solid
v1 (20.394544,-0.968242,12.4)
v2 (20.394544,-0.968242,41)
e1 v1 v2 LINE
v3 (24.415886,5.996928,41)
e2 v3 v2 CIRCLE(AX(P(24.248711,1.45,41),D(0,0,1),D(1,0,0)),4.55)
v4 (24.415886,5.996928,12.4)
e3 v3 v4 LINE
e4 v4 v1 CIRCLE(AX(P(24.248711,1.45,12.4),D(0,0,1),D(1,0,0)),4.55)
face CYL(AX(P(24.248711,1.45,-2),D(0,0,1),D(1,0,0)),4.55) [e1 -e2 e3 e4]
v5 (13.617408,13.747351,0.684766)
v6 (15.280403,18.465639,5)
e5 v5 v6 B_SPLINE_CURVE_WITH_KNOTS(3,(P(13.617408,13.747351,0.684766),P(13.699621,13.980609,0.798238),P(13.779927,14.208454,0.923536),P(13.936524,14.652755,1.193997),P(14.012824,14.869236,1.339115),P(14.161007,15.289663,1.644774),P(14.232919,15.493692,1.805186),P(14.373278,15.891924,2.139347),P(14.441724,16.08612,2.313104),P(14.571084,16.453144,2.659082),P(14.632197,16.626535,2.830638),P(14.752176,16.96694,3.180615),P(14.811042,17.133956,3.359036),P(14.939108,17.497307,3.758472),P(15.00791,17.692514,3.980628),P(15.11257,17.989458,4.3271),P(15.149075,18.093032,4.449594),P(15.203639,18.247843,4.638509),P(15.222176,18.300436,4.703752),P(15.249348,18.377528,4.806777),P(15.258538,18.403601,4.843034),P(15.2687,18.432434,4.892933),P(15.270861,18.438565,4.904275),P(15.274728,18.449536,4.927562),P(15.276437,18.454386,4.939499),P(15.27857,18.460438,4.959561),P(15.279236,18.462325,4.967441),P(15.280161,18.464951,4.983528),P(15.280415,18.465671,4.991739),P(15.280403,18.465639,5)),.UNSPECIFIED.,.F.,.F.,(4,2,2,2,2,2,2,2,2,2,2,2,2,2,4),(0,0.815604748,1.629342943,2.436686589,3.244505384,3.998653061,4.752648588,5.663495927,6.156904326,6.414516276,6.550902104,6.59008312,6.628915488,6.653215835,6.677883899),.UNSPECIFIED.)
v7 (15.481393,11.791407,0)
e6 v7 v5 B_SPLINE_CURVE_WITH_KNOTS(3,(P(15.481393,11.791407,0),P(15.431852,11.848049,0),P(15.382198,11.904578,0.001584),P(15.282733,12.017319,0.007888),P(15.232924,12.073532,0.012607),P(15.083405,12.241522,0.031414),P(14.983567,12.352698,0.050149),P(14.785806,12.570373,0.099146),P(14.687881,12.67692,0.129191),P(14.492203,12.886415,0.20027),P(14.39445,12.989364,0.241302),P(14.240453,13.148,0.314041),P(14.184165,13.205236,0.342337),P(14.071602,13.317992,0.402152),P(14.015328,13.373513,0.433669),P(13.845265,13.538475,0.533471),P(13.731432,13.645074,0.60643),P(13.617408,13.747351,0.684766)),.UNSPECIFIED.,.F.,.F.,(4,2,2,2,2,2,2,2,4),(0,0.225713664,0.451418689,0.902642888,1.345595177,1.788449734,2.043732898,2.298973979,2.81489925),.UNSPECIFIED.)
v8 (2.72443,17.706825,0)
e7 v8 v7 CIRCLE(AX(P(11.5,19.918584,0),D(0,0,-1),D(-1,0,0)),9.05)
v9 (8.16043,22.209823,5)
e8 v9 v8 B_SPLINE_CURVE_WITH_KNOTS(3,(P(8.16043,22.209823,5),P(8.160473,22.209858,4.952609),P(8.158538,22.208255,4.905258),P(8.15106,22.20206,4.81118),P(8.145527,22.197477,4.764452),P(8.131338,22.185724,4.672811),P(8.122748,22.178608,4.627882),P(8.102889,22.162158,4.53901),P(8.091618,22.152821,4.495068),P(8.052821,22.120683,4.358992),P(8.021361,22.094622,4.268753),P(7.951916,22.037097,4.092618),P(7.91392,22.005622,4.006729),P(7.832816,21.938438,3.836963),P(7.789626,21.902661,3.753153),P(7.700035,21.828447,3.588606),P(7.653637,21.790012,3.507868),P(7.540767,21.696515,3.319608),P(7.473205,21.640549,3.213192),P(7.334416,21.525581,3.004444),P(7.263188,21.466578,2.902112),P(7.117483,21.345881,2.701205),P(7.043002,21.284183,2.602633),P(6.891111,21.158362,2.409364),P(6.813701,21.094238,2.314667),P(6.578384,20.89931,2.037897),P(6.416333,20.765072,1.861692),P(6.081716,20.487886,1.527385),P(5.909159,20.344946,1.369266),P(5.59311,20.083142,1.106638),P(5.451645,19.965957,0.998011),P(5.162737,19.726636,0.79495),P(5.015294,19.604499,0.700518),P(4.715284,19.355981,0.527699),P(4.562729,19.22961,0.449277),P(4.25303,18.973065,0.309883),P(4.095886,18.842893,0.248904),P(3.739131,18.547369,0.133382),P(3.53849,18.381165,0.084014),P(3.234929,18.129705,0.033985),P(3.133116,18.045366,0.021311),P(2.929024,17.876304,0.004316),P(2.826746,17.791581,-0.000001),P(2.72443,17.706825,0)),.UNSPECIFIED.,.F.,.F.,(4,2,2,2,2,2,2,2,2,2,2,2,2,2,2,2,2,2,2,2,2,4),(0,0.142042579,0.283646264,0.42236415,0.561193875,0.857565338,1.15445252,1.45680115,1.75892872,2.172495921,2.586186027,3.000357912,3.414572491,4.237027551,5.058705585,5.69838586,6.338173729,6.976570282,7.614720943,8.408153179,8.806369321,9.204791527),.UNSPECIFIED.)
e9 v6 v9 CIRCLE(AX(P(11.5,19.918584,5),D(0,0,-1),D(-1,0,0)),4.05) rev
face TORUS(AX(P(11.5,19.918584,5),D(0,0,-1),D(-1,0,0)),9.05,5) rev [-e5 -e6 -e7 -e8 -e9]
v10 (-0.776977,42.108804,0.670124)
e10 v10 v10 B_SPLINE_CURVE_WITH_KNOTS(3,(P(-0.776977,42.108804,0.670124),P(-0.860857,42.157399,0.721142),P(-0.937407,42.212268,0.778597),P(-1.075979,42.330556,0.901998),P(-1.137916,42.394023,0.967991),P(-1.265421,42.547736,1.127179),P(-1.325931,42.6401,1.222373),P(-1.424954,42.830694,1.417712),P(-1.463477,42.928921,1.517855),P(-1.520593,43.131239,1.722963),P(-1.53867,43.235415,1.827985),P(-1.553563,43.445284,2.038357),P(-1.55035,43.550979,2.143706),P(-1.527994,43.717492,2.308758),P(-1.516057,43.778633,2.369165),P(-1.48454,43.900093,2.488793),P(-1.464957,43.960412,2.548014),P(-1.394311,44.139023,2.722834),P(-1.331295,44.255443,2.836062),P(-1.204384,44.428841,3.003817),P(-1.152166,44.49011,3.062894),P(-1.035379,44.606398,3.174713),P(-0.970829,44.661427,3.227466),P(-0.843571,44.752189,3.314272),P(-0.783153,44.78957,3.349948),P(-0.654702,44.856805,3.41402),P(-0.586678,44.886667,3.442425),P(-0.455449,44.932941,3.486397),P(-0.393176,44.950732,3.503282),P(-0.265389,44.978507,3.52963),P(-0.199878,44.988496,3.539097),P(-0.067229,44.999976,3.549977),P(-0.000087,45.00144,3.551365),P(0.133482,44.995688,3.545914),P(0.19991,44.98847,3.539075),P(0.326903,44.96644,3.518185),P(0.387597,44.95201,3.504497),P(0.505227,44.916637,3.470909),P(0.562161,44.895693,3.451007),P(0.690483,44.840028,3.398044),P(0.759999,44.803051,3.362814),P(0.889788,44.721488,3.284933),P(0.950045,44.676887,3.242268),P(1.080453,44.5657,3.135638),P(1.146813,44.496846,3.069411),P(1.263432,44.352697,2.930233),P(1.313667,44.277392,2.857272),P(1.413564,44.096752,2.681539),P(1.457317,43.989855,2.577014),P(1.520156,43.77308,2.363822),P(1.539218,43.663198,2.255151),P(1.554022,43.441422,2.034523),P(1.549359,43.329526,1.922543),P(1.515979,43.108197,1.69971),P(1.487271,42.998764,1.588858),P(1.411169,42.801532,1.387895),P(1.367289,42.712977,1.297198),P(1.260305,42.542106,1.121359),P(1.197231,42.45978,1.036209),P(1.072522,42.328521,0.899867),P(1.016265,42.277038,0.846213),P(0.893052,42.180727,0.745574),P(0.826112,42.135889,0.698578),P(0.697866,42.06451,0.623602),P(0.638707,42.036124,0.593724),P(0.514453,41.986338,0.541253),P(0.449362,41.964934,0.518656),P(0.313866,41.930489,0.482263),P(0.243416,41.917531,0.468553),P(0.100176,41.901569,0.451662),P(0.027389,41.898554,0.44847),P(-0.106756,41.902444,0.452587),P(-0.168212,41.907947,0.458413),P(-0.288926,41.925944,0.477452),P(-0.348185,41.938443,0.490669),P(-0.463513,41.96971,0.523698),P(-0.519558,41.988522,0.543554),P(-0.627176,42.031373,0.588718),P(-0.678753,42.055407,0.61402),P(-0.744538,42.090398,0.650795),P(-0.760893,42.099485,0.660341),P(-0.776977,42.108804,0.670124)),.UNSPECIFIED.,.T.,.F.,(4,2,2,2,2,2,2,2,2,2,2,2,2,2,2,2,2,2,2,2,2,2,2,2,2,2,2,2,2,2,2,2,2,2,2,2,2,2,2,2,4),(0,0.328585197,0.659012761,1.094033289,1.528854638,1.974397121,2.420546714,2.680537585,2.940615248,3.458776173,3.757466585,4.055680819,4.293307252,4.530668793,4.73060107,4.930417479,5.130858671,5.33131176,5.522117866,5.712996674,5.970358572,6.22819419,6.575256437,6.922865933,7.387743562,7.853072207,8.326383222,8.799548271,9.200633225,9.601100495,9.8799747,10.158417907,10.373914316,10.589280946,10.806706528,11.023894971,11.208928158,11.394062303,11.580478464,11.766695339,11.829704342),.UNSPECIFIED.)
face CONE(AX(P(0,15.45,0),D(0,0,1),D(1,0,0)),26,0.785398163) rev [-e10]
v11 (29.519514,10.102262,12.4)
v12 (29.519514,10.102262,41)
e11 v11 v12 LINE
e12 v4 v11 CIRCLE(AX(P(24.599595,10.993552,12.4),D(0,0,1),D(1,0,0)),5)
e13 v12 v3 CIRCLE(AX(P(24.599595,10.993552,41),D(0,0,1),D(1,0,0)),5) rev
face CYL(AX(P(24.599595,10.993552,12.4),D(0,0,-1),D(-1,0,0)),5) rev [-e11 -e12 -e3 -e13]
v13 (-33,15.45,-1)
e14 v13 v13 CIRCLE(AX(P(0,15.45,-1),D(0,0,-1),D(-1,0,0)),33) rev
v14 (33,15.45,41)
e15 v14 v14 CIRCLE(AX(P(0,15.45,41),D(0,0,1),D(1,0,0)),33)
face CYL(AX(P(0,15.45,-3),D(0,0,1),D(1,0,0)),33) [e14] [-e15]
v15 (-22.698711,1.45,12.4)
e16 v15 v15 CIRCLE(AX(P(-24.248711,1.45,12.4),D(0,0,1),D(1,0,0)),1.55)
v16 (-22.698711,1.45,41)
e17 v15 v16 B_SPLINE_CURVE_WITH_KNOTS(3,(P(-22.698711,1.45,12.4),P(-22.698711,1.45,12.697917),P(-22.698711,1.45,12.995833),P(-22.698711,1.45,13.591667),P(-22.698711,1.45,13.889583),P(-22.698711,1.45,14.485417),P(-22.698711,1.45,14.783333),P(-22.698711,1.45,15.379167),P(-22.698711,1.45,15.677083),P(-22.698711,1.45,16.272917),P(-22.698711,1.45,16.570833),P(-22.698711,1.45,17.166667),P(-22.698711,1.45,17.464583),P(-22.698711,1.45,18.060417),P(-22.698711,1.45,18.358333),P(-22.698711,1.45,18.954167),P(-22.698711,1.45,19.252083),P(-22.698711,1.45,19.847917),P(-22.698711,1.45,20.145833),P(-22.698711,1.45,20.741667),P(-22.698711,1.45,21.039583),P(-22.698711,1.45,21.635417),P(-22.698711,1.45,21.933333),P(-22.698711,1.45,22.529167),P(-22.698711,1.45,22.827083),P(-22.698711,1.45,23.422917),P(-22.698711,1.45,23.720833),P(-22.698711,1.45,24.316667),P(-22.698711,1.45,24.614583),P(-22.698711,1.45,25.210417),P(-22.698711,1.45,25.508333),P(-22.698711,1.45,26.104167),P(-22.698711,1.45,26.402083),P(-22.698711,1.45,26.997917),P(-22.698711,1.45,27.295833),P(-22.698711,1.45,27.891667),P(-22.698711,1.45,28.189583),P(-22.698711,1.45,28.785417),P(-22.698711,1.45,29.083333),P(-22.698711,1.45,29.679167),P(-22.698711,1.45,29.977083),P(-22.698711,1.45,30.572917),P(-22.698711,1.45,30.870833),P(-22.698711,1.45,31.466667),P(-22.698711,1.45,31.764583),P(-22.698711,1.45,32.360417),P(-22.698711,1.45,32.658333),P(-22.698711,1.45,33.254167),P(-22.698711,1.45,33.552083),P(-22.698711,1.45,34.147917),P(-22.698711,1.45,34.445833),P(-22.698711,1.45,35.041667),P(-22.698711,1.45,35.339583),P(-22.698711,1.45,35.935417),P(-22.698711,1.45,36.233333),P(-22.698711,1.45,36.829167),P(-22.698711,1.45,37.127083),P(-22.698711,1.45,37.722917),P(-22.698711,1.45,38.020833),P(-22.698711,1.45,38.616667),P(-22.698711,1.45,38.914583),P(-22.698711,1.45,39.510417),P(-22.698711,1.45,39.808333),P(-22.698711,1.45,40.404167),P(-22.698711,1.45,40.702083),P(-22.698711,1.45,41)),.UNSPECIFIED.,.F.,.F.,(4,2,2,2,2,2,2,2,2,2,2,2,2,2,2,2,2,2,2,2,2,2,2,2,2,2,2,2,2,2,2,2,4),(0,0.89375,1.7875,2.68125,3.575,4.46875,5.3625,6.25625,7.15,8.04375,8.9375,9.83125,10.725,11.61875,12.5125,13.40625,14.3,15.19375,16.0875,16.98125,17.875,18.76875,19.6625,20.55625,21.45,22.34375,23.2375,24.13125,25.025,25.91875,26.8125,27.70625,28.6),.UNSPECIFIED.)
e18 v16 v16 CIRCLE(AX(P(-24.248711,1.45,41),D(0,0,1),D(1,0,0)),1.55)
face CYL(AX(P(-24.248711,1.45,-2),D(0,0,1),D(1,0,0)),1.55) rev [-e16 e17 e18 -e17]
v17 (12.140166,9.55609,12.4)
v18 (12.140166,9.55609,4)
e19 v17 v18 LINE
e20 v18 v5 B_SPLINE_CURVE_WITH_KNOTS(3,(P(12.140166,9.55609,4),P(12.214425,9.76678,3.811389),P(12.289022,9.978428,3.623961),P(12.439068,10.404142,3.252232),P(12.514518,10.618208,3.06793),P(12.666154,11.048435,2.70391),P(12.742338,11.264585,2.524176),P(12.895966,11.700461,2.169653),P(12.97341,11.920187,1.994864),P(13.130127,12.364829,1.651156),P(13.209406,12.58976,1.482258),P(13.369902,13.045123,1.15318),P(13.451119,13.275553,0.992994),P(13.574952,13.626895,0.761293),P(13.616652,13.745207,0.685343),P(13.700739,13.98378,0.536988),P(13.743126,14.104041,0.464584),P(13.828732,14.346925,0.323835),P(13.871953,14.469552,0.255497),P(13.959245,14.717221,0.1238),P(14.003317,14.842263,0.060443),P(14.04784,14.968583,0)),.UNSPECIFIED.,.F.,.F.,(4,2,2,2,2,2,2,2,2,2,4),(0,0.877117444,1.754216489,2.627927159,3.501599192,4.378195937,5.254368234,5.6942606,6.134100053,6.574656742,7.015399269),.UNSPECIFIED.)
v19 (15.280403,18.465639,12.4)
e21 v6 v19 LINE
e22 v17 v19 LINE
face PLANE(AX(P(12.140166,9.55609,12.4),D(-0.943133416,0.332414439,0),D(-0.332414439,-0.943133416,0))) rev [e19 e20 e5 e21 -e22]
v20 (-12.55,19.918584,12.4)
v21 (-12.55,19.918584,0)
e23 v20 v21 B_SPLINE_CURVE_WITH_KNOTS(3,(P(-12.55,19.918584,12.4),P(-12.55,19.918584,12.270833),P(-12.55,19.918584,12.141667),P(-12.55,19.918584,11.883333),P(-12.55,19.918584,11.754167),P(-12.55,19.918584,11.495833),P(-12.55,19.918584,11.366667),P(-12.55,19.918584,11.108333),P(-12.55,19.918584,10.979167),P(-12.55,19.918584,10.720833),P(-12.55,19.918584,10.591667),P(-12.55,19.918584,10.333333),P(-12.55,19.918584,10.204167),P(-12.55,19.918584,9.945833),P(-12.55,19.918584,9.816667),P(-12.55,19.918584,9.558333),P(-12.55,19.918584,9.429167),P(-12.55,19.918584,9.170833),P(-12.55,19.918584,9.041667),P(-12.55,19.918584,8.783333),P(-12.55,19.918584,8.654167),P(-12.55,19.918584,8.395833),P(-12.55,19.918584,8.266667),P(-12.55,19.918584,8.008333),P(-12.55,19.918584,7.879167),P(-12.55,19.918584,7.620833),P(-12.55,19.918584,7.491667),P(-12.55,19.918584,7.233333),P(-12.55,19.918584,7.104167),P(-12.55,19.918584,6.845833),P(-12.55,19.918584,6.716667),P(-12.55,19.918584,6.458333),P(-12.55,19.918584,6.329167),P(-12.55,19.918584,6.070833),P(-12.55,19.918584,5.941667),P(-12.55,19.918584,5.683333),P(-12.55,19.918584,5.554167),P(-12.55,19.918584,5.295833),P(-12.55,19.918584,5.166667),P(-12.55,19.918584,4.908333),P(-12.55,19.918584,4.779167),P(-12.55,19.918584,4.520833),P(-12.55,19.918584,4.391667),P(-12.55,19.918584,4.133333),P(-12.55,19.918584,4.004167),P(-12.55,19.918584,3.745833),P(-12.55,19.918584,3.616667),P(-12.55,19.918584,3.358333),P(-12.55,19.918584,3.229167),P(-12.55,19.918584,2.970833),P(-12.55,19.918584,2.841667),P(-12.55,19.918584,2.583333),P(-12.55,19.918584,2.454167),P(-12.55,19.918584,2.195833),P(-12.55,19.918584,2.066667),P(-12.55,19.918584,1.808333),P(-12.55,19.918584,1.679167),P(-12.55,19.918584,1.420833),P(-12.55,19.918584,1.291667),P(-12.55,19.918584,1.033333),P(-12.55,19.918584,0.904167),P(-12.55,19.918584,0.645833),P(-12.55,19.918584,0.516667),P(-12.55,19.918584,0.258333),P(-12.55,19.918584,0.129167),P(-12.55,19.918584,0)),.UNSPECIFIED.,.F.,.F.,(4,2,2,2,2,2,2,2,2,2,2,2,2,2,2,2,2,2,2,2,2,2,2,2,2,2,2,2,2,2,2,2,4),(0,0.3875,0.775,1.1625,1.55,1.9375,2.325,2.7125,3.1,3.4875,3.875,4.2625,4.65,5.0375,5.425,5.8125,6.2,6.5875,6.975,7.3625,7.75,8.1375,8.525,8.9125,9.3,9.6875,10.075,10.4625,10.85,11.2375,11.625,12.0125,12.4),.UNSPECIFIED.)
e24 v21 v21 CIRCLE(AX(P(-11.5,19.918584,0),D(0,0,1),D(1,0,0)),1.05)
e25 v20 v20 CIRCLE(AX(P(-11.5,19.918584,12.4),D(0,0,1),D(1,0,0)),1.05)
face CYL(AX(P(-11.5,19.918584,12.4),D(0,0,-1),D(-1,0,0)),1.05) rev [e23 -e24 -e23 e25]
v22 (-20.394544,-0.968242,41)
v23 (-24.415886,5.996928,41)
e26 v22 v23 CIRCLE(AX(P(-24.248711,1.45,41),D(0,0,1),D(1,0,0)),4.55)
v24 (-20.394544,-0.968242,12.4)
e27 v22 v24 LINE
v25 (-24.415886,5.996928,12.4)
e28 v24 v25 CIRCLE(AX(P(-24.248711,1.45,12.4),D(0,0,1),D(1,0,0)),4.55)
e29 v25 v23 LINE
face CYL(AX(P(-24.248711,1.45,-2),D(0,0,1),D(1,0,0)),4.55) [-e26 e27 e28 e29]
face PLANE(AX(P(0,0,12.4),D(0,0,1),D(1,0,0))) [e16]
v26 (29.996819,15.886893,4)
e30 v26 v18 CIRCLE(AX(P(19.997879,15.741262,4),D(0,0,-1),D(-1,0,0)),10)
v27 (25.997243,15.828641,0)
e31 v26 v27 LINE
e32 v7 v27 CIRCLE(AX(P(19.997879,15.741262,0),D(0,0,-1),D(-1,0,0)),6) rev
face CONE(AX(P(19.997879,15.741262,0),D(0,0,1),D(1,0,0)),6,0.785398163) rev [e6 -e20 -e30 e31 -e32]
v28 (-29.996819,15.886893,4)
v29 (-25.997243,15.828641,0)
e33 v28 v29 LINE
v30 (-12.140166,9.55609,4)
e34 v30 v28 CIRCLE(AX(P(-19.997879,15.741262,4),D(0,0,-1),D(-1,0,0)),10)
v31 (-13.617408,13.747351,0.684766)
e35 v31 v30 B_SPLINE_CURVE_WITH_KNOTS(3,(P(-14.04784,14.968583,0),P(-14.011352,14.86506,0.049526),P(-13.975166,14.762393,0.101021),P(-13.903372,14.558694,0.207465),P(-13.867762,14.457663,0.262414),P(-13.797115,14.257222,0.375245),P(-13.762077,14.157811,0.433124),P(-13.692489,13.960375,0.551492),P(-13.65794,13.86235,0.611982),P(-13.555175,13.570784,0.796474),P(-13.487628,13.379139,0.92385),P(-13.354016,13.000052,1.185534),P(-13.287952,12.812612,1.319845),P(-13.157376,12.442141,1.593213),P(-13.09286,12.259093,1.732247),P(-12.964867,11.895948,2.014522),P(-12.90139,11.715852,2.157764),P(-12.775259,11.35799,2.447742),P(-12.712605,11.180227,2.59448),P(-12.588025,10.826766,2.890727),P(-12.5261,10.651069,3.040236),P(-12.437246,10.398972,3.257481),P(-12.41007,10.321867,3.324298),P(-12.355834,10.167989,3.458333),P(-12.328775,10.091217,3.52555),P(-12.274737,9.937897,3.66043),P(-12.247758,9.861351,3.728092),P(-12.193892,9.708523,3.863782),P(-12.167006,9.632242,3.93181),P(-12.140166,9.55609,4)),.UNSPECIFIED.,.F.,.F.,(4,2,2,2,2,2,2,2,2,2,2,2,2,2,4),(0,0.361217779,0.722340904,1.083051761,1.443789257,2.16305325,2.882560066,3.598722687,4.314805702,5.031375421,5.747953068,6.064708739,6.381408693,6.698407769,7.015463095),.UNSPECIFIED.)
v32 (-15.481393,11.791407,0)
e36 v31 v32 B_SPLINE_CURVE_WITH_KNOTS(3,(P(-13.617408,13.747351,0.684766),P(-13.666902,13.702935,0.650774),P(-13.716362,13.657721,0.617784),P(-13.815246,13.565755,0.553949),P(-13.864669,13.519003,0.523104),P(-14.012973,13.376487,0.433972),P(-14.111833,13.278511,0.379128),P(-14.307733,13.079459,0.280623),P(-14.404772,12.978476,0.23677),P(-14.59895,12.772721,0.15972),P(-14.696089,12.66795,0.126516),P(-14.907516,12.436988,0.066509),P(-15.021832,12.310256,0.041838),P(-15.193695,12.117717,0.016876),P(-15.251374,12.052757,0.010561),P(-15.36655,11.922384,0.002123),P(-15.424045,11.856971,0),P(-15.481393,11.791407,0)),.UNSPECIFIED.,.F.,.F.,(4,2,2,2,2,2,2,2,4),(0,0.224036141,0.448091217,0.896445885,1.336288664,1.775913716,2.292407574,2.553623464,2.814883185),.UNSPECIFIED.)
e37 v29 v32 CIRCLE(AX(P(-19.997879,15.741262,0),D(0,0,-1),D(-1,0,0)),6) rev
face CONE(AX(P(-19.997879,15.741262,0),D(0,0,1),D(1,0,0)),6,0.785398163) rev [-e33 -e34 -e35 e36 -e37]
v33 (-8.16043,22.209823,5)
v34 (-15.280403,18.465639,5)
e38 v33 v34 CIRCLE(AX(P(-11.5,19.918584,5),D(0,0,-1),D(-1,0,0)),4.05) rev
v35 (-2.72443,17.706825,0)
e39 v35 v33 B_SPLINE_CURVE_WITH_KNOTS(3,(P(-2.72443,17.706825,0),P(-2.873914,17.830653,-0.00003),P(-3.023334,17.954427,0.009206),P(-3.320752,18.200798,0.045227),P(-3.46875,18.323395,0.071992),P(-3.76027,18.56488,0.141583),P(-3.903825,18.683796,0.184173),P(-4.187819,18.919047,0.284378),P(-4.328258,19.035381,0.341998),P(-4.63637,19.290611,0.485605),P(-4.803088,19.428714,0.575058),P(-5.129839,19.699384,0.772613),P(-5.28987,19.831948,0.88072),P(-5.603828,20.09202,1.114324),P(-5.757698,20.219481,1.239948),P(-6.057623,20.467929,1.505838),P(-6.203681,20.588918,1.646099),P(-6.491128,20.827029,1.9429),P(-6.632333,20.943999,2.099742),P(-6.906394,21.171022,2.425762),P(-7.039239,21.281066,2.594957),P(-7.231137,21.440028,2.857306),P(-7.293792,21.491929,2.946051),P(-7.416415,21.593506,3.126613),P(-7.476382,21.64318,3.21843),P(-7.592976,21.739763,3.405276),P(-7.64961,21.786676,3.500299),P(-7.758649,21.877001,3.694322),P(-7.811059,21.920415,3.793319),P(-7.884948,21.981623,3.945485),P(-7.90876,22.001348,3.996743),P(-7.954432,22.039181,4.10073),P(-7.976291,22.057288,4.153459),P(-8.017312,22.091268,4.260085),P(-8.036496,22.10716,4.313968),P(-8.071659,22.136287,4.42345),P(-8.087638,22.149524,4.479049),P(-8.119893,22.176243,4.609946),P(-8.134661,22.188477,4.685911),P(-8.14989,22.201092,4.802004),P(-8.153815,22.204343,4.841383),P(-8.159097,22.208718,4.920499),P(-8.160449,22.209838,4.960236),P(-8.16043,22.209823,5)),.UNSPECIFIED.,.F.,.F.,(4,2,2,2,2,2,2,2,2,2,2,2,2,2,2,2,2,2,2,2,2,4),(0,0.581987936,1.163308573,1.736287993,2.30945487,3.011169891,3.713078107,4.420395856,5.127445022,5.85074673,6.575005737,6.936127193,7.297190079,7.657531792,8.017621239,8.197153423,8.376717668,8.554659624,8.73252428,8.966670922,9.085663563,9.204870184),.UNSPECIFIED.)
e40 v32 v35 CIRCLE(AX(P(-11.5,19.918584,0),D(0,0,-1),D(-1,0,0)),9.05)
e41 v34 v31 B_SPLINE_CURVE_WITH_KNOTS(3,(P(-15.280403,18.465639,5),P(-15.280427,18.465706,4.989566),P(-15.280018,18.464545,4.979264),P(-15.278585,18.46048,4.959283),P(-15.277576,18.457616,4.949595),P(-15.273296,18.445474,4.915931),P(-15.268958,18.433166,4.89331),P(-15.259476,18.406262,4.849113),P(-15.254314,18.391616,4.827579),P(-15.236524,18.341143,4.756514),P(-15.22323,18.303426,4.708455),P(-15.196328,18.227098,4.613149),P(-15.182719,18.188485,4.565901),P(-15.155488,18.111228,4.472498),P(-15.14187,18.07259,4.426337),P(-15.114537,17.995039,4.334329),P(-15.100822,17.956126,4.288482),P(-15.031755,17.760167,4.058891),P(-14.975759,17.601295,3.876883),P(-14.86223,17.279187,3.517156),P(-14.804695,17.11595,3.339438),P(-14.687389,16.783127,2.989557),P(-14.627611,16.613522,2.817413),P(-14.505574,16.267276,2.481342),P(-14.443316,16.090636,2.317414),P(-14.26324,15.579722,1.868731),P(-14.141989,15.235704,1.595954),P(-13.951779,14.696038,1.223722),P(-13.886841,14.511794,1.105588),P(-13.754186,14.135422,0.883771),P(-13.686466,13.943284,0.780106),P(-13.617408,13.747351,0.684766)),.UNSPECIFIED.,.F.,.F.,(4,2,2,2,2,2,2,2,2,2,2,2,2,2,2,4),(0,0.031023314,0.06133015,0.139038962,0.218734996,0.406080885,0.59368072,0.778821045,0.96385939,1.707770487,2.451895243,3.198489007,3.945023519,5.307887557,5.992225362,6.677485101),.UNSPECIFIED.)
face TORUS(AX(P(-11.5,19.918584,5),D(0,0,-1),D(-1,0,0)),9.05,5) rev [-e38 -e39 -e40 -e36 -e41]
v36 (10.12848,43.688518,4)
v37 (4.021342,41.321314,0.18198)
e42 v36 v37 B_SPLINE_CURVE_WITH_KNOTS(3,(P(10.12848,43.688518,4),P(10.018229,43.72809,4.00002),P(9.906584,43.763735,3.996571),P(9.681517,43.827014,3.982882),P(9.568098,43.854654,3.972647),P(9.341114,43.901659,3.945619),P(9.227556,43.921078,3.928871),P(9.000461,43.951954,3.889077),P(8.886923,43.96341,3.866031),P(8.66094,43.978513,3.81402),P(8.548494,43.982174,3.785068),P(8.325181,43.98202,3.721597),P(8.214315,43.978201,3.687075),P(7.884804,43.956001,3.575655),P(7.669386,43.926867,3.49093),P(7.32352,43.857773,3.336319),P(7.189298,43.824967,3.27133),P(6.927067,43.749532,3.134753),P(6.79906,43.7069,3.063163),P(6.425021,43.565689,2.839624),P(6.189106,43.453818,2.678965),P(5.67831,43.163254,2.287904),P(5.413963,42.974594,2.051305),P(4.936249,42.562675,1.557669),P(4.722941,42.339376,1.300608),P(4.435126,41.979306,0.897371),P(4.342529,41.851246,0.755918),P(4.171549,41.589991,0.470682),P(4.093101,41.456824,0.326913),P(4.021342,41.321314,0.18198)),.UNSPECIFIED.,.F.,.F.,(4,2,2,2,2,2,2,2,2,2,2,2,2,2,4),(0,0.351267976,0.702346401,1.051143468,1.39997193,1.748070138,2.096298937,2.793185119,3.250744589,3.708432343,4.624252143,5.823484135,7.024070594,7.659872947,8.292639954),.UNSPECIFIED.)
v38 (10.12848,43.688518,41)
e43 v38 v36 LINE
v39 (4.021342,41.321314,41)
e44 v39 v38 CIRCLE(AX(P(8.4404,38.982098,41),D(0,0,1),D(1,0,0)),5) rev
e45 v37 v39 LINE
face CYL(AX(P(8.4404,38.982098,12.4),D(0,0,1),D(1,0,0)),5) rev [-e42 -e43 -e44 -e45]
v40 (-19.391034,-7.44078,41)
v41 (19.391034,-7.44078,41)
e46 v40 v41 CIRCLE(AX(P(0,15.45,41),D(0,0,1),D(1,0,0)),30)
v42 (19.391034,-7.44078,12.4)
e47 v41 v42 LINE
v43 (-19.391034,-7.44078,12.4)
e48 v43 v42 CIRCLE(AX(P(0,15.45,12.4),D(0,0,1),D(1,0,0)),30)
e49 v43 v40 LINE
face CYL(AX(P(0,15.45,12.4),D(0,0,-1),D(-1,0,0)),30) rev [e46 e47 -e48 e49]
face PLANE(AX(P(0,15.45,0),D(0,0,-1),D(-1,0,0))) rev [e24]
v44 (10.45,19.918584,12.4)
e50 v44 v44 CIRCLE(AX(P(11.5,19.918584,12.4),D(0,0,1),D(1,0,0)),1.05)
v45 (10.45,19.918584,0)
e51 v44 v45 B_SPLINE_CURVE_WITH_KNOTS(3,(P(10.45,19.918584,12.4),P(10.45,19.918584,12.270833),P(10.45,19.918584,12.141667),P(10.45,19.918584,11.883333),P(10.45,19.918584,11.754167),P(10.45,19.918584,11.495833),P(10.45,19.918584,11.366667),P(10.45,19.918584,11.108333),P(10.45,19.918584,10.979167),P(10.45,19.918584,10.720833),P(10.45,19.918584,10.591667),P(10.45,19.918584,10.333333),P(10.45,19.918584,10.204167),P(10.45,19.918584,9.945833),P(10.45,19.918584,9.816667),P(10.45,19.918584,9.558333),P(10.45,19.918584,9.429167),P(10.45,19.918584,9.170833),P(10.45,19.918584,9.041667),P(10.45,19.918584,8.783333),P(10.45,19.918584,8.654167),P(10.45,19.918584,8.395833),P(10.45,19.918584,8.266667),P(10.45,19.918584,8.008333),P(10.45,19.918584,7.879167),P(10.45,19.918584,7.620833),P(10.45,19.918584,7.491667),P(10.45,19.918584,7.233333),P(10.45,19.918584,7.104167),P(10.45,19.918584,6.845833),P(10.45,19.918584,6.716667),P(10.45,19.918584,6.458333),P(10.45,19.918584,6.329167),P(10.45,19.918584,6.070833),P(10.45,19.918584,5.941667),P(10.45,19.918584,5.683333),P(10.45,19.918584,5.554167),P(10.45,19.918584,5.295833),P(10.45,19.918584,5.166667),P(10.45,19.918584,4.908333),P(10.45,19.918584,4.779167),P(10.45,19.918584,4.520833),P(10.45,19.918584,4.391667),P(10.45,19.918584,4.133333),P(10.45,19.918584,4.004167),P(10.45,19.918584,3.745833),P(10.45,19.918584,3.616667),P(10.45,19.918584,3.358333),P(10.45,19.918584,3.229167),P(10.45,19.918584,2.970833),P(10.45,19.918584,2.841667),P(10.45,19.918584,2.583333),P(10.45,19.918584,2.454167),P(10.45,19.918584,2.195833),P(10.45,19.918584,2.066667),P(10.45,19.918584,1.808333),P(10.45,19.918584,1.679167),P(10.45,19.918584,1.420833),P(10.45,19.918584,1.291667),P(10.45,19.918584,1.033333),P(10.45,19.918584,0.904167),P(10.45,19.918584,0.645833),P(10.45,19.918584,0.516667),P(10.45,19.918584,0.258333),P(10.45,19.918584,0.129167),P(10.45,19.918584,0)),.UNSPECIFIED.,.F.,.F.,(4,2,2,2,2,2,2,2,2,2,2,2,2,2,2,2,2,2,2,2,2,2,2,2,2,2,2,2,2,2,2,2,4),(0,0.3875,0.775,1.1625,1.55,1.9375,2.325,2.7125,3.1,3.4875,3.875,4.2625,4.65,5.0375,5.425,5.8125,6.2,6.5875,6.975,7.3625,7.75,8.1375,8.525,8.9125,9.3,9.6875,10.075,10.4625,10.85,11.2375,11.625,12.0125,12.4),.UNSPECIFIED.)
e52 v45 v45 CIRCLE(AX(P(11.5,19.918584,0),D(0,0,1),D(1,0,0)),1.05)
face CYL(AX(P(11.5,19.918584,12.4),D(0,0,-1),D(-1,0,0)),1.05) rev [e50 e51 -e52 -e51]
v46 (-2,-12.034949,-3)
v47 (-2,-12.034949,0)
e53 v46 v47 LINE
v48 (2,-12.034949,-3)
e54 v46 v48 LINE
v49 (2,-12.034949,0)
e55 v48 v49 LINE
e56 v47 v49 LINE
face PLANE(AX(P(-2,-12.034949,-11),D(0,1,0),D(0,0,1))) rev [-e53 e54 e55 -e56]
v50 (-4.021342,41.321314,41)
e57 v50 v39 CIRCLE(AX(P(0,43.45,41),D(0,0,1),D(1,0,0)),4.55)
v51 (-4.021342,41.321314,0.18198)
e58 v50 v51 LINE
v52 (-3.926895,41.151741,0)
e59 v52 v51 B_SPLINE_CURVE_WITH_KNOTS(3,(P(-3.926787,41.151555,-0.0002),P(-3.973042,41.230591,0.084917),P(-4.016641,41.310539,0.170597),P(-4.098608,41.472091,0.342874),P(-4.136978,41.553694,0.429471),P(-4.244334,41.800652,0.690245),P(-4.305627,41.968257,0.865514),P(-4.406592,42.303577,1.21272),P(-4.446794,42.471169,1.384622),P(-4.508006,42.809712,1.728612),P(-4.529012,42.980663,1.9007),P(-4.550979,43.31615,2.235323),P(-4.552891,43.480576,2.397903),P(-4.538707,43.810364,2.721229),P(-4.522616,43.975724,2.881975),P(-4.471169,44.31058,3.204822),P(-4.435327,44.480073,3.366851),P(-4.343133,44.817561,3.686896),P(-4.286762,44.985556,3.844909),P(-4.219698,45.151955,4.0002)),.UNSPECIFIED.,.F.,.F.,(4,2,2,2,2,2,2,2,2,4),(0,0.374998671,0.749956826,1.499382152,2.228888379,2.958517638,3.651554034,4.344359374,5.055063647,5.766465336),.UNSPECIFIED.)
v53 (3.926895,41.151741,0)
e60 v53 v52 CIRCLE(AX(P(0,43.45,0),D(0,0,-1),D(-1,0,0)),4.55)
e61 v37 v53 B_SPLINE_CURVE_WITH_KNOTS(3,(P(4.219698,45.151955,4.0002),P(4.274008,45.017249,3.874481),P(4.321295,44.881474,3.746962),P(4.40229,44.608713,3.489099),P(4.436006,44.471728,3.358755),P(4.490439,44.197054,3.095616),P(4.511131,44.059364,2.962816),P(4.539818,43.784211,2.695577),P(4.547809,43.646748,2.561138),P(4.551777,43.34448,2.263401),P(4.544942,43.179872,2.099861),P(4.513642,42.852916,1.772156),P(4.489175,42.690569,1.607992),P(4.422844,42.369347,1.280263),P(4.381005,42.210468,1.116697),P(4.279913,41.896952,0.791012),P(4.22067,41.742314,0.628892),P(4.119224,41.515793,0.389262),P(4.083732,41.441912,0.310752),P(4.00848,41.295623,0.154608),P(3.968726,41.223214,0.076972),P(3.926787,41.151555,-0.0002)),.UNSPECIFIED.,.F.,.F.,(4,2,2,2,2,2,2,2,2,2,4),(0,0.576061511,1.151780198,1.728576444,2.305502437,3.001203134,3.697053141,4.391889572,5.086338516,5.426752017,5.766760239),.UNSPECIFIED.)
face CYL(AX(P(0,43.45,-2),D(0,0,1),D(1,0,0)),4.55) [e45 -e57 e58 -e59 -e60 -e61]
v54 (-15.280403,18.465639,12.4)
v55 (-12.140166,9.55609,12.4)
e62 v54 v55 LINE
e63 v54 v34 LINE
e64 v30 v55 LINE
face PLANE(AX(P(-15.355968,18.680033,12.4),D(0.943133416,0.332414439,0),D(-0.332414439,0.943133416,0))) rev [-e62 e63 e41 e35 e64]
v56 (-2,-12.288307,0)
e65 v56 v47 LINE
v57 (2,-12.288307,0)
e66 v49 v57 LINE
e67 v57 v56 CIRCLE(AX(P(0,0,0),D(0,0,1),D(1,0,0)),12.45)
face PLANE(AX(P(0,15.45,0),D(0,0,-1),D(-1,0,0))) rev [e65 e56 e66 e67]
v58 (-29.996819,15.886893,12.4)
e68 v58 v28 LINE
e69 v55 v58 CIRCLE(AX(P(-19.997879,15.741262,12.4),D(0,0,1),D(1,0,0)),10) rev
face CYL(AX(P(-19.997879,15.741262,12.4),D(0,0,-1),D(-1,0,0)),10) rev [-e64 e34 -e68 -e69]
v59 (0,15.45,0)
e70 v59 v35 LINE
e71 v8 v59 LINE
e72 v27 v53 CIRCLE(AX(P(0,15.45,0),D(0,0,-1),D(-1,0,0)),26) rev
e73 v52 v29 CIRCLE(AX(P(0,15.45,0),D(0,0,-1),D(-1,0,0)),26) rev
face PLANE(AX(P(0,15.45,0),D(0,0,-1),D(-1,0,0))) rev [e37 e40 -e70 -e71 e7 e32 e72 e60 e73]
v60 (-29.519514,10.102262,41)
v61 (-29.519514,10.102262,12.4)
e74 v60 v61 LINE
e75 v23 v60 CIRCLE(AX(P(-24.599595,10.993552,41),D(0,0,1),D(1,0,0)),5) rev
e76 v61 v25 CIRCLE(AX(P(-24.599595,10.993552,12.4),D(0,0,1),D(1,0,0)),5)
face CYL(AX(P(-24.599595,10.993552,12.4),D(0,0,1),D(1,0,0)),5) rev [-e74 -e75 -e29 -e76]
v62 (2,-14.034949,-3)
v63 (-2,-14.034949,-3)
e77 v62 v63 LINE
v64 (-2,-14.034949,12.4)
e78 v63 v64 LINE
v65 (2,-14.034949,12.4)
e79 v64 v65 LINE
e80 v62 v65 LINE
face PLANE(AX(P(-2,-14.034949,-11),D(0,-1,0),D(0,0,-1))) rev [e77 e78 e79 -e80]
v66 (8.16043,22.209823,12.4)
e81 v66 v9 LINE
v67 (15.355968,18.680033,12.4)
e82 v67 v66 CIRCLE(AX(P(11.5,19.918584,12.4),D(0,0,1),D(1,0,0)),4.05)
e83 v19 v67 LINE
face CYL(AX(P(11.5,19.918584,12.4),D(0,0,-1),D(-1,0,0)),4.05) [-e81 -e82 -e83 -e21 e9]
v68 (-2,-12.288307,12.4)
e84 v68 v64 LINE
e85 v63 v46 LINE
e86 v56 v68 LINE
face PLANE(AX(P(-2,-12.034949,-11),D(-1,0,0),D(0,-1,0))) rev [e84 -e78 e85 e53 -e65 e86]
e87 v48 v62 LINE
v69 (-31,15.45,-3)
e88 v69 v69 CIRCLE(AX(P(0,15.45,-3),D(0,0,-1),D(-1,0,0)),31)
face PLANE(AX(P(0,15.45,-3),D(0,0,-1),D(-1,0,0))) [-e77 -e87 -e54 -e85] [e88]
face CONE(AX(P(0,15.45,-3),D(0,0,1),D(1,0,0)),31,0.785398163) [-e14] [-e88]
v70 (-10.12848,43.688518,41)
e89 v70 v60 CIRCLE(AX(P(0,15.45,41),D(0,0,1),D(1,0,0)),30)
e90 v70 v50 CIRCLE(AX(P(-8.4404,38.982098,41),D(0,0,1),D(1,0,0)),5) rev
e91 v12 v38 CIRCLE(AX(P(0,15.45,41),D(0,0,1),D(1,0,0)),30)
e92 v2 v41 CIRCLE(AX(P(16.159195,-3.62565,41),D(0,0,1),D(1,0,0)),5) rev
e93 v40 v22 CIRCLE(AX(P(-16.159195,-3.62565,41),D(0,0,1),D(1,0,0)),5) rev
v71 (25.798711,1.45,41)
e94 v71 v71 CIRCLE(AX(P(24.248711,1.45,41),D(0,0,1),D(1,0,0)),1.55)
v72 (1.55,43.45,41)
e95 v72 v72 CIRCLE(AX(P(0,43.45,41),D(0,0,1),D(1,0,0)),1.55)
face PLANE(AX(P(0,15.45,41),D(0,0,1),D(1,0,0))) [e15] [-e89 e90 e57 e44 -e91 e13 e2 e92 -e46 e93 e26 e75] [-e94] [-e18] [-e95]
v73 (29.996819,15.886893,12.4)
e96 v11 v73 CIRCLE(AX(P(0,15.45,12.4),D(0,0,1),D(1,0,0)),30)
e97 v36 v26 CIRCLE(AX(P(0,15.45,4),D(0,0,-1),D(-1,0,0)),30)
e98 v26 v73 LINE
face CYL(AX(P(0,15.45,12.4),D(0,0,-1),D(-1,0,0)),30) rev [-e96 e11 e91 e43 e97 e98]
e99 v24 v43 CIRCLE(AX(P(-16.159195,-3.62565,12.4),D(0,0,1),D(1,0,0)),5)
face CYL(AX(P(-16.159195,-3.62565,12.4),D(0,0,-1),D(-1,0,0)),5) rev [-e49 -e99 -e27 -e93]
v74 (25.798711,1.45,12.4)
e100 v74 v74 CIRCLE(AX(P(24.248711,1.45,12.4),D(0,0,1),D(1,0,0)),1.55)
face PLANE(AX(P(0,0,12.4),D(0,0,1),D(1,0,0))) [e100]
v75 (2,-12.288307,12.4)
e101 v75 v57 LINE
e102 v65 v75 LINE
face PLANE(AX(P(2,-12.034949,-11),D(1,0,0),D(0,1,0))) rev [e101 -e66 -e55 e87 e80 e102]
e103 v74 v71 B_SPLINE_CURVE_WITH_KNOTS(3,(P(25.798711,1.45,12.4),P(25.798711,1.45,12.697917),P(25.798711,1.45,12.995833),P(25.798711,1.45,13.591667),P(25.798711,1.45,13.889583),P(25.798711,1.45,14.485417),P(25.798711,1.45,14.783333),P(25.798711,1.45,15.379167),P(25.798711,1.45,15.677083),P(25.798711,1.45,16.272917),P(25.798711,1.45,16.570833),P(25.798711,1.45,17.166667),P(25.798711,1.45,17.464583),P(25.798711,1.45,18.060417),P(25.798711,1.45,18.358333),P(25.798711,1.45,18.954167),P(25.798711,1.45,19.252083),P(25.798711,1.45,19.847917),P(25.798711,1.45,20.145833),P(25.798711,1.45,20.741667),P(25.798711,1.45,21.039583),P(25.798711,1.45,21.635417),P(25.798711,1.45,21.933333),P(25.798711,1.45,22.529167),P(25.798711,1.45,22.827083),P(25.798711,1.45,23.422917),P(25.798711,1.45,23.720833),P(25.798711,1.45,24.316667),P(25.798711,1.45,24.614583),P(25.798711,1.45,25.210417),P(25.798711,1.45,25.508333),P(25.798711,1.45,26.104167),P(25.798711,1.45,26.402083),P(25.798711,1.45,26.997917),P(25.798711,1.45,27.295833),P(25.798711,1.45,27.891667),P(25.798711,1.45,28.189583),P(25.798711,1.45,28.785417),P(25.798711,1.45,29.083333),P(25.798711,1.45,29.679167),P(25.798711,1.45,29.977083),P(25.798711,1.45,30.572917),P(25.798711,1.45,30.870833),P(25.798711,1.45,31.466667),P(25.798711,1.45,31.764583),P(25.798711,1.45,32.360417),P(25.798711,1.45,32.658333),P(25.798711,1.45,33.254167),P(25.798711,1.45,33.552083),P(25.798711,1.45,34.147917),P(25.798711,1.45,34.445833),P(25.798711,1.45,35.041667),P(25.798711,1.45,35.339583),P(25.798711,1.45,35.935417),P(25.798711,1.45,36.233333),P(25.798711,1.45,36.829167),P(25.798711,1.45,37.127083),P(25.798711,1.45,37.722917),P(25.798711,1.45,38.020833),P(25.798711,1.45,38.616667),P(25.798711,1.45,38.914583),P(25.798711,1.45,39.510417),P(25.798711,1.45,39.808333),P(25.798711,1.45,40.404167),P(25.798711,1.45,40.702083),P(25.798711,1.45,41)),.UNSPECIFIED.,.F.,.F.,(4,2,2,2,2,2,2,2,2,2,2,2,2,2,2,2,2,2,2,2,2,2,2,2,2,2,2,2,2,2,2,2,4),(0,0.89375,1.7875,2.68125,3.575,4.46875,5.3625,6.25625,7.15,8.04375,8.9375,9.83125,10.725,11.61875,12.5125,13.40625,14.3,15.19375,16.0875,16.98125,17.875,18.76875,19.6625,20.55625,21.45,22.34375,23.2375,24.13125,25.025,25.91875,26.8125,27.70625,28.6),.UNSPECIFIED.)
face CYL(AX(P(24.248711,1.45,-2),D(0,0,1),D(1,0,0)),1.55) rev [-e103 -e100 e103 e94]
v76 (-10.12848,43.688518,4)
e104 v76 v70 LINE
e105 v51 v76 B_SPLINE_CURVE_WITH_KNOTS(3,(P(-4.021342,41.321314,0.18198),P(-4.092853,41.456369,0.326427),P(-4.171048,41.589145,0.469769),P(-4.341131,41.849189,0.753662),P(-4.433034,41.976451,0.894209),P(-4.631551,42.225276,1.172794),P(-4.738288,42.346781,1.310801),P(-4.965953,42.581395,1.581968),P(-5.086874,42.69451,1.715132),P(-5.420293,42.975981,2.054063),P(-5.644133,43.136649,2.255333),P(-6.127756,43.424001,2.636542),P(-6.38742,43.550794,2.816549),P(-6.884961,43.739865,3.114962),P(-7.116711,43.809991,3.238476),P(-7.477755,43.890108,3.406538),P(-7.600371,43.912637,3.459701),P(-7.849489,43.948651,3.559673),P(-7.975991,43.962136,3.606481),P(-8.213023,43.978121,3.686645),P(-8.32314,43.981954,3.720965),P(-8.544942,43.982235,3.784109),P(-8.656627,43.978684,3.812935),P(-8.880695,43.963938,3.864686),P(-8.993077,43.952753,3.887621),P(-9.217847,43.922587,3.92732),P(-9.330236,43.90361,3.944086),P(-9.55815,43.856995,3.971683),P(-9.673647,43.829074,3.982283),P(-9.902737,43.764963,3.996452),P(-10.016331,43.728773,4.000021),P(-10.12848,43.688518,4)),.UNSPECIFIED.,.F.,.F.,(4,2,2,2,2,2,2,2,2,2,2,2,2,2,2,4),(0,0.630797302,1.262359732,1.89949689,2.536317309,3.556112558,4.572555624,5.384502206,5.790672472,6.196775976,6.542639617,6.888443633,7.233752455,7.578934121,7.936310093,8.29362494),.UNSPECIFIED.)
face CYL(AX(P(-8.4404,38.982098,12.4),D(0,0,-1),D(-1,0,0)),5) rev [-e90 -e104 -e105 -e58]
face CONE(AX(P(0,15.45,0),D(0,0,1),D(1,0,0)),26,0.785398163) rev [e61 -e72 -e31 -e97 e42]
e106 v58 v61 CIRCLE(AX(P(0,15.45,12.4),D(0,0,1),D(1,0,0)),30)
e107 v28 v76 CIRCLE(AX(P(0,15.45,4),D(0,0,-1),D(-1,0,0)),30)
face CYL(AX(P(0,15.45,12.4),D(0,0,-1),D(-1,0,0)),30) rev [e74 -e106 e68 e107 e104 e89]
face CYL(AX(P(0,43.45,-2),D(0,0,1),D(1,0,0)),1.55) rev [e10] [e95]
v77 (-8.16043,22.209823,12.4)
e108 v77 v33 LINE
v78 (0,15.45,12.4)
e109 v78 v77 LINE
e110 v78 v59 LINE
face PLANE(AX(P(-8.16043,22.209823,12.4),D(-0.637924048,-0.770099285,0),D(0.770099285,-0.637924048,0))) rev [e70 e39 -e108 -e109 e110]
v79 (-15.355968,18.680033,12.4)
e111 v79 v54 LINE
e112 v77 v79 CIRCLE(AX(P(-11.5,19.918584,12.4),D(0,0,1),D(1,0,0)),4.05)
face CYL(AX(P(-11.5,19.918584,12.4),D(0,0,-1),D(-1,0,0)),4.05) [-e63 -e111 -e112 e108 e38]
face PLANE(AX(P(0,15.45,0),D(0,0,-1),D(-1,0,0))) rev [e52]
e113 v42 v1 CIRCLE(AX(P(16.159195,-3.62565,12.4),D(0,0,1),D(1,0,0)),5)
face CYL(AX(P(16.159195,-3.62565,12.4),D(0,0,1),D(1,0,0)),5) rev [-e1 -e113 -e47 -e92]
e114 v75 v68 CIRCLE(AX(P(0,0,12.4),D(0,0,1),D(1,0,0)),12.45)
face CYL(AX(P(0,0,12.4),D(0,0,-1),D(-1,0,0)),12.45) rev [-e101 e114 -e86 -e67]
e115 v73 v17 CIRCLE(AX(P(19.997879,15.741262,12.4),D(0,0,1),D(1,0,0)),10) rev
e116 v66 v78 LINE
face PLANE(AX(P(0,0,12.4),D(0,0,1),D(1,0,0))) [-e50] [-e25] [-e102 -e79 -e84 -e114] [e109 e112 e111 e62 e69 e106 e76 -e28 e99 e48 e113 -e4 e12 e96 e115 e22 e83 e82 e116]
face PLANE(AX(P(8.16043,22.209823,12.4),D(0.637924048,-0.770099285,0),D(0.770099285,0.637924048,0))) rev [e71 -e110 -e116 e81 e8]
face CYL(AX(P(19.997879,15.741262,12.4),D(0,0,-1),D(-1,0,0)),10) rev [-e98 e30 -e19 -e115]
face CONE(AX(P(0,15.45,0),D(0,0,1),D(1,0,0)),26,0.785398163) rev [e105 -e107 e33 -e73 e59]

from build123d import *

# Parameters (mm, degrees)
SKETCH1_R                = 15.45
SKETCH1_R_2              = 12.45
SKETCH1_R_3              = 33
SKETCH1_R_4              = 30
SKETCH1_R_5              = 4.05
SKETCH1_R_6              = 1.05
BOSS_EXTRUDE2_DEPTH      = 12.4
BOSS_EXTRUDE3_START      = 3
SKETCH2_R                = 33
BOSS_EXTRUDE3_DEPTH      = 3
SKETCH3_R                = 33
SKETCH3_R_2              = 30
BOSS_EXTRUDE4_DEPTH      = 28.6
FILLET1_R                = 10
BOSS_EXTRUDE5_DEPTH      = 12.4
CHAMFER1_SIZE            = 4
FILLET2_R                = 5
BOSS_EXTRUDE6_DEPTH      = 28.6
BOSS_EXTRUDE6_DEPTH_BACK = 14.4
SKETCH5_R                = 4.55
SKETCH5_R_2              = 1.55
FILLET3_R                = 5
CHAMFER2_SIZE            = 2
SKETCH6_W                = 4
SKETCH6_H                = 2
CUT_EXTRUDE1_DEPTH       = 23.4


with BuildPart() as part:
    # Sketch1 → Boss-Extrude2 (new body)
    # profile 1 of 4: a face of its own
    with BuildSketch(Plane.XY):
        Circle(SKETCH1_R)
        with Locations(Location((0, 0, 0), (0, 0, 180))):
            Circle(SKETCH1_R_2, mode=Mode.SUBTRACT)
    # profile 2 of 4: a face of its own
    with BuildSketch(Plane.XY):
        with Locations(Location((0, 15.45, 0), (0, 0, 180))):
            Circle(SKETCH1_R_3)
        with Locations((0, 15.45)):
            Circle(SKETCH1_R_4, mode=Mode.SUBTRACT)
    # profile 3 of 4: a face of its own
    with BuildSketch(Plane.XY):
        with Locations(Location((11.5, 19.918584287, 0), (0, 0, 180))):
            Circle(SKETCH1_R_5)
        with Locations(Location((11.5, 19.918584287, 0), (0, 0, 180))):
            Circle(SKETCH1_R_6, mode=Mode.SUBTRACT)
    # profile 4 of 4: a face of its own
    with BuildSketch(Plane.XY):
        with Locations(Location((-11.5, 19.918584287, 0), (0, 0, 180))):
            Circle(SKETCH1_R_5)
        with Locations(Location((-11.5, 19.918584287, 0), (0, 0, 180))):
            Circle(SKETCH1_R_6, mode=Mode.SUBTRACT)
    extrude(amount=BOSS_EXTRUDE2_DEPTH)

    # Sketch2 → Boss-Extrude3 (add)
    with BuildSketch(Plane(origin=(0, 0, 0), x_dir=(-1, 0, 0), z_dir=(0, 0, -1)).offset(BOSS_EXTRUDE3_START)):
        with Locations(Location((0, 15.45, 0), (0, 0, 180))):
            Circle(SKETCH2_R)
    extrude(amount=-BOSS_EXTRUDE3_DEPTH)

    # Sketch3 → Boss-Extrude4 (add)
    with BuildSketch(Plane.XY.offset(12.4)):
        with Locations((0, 15.45)):
            Circle(SKETCH3_R)
        with Locations(Location((0, 15.45, 0), (0, 0, 256.137567884))):
            Circle(SKETCH3_R_2, mode=Mode.SUBTRACT)
    extrude(amount=BOSS_EXTRUDE4_DEPTH)

    # Fillet1
    # the kernel refuses this fillet: 10 mm, written as the material it adds along each edge
    with BuildSketch(Plane(origin=(-7.18774525, -13.676213592, 12.4), x_dir=(-0.20848530714015037, 0.9780254990063793, 0), z_dir=(0, 0, -1))) as fillet1_piece_1:
        with BuildLine():
            CenterArc((31.441766058, -6.395526036), FILLET1_R, 140.241533635, 142.62650255)
            ThreePointArc((33.668828933, -16.144381915), (14.016585538, -13.948724396), (0, 0))
            ThreePointArc((0, 0), (11.877146347, -5.568912274), (23.754292694, 0))
        make_face()
    extrude(amount=12.4)
    with BuildSketch(Plane(origin=(7.18774525, -13.676213592, 12.4), x_dir=(0.20848530714015037, 0.9780254990063793, 0), z_dir=(0, 0, -1))) as fillet1_piece_2:
        with BuildLine():
            CenterArc((31.441766058, 6.395526036), FILLET1_R, 77.131963815, 142.62650255)
            ThreePointArc((33.668828933, 16.144381915), (14.016585538, 13.948724396), (0, 0))
            ThreePointArc((0, 0), (11.877146347, 5.568912274), (23.754292694, 0))
        make_face()
    extrude(amount=12.4)

    # Sketch4 → Boss-Extrude5 (add)
    with BuildSketch(Plane.XY):
        Polygon((-15.355968184, 18.680032971), (-12.140166258, 9.556090373), (-4.457434094, 12.838952207), (4.080215127, 12.838952207), (12.140166258, 9.556090373), (15.355968184, 18.680032971), (9.70403689, 17.830268754), (8.160430255, 22.209822799), (0, 15.45), (-8.160430255, 22.209822799), (-10.090971595, 17.830268754), align=None)
    extrude(amount=BOSS_EXTRUDE5_DEPTH)

    # Chamfer1
    chamfer1_edges = [part.edges().sort_by_distance(p)[0] for p in [
        (0, 45.45, 0),
        (-23.339432443, 6.316081984, 0),
        (23.339432443, 6.316081984, 0),
    ]]
    chamfer(chamfer1_edges, length=CHAMFER1_SIZE)

    # Fillet2
    # the kernel refuses this fillet: 5 mm, written as the material it adds along each edge
    with BuildSketch(Plane(origin=(-11.5, 19.918584287, 0), x_dir=(0.4626548968458433, -0.8865384630260337, 0), z_dir=(0.8865384630260337, 0.4626548968458433, 0))) as fillet2_piece_1:
        with BuildLine():
            CenterArc((4.05 + FILLET2_R, -FILLET2_R), FILLET2_R, 90, 90)
            Line((4.05, -FILLET2_R), (4.05, 0))
            Line((4.05, 0), (4.05 + FILLET2_R, 0))
        make_face()
    revolve(axis=Axis((-11.5, 19.918584287, 0), (0, 0, -1)), revolution_arc=359.64)
    with BuildSketch(Plane(origin=(11.5, 19.918584287, 0), x_dir=(-0.4682160132284685, -0.8836140361925214, 0), z_dir=(0.8836140361925214, -0.4682160132284685, 0))) as fillet2_piece_2:
        with BuildLine():
            CenterArc((4.05 + FILLET2_R, -FILLET2_R), FILLET2_R, 90, 90)
            Line((4.05, -FILLET2_R), (4.05, 0))
            Line((4.05, 0), (4.05 + FILLET2_R, 0))
        make_face()
    revolve(axis=Axis((11.5, 19.918584287, 0), (0, 0, -1)), revolution_arc=359.64)

    # Sketch5 → Boss-Extrude6 (add, two sides: drawn at the far end of the back side and taken through both)
    # profile 1 of 3: a face of its own
    with BuildSketch(Plane.XY.offset(12.4).offset(-BOSS_EXTRUDE6_DEPTH_BACK)):
        with Locations((0, 43.45)):
            Circle(SKETCH5_R)
        with Locations((0, 43.45)):
            Circle(SKETCH5_R_2, mode=Mode.SUBTRACT)
    # profile 2 of 3: a face of its own
    with BuildSketch(Plane.XY.offset(12.4).offset(-BOSS_EXTRUDE6_DEPTH_BACK)):
        with Locations((24.248711306, 1.45)):
            Circle(SKETCH5_R)
        with Locations((24.248711306, 1.45)):
            Circle(SKETCH5_R_2, mode=Mode.SUBTRACT)
    # profile 3 of 3: a face of its own
    with BuildSketch(Plane.XY.offset(12.4).offset(-BOSS_EXTRUDE6_DEPTH_BACK)):
        with Locations((-24.248711306, 1.45)):
            Circle(SKETCH5_R)
        with Locations((-24.248711306, 1.45)):
            Circle(SKETCH5_R_2, mode=Mode.SUBTRACT)
    extrude(amount=BOSS_EXTRUDE6_DEPTH + BOSS_EXTRUDE6_DEPTH_BACK)

    # Fillet3
    fillet3_edges = [part.edges().sort_by_distance(p)[0] for p in [
        (23.612570286, -3.055310711, 26.7),
        (27.832354323, 4.25356964, 26.7),
        (-27.832354323, 4.25356964, 26.7),
        (-23.612570286, -3.055310711, 26.7),
        (4.219784038, 45.151741071, 22.5),
        (-4.219784038, 45.151741071, 22.5),
    ]]
    fillet(fillet3_edges, radius=FILLET3_R)

    # Chamfer2
    chamfer2_edges = [part.edges().sort_by_distance(p)[0] for p in [
        (-33, 15.45, -3),
    ]]
    chamfer(chamfer2_edges, length=CHAMFER2_SIZE)

    # Sketch6 → Cut-Extrude1 (cut)
    with BuildSketch(Plane.XY.offset(12.4)):
        with Locations((0, -13.034949107)):
            Rectangle(SKETCH6_W, SKETCH6_H)
    extrude(amount=-CUT_EXTRUDE1_DEPTH, mode=Mode.SUBTRACT)


solid = part.part
